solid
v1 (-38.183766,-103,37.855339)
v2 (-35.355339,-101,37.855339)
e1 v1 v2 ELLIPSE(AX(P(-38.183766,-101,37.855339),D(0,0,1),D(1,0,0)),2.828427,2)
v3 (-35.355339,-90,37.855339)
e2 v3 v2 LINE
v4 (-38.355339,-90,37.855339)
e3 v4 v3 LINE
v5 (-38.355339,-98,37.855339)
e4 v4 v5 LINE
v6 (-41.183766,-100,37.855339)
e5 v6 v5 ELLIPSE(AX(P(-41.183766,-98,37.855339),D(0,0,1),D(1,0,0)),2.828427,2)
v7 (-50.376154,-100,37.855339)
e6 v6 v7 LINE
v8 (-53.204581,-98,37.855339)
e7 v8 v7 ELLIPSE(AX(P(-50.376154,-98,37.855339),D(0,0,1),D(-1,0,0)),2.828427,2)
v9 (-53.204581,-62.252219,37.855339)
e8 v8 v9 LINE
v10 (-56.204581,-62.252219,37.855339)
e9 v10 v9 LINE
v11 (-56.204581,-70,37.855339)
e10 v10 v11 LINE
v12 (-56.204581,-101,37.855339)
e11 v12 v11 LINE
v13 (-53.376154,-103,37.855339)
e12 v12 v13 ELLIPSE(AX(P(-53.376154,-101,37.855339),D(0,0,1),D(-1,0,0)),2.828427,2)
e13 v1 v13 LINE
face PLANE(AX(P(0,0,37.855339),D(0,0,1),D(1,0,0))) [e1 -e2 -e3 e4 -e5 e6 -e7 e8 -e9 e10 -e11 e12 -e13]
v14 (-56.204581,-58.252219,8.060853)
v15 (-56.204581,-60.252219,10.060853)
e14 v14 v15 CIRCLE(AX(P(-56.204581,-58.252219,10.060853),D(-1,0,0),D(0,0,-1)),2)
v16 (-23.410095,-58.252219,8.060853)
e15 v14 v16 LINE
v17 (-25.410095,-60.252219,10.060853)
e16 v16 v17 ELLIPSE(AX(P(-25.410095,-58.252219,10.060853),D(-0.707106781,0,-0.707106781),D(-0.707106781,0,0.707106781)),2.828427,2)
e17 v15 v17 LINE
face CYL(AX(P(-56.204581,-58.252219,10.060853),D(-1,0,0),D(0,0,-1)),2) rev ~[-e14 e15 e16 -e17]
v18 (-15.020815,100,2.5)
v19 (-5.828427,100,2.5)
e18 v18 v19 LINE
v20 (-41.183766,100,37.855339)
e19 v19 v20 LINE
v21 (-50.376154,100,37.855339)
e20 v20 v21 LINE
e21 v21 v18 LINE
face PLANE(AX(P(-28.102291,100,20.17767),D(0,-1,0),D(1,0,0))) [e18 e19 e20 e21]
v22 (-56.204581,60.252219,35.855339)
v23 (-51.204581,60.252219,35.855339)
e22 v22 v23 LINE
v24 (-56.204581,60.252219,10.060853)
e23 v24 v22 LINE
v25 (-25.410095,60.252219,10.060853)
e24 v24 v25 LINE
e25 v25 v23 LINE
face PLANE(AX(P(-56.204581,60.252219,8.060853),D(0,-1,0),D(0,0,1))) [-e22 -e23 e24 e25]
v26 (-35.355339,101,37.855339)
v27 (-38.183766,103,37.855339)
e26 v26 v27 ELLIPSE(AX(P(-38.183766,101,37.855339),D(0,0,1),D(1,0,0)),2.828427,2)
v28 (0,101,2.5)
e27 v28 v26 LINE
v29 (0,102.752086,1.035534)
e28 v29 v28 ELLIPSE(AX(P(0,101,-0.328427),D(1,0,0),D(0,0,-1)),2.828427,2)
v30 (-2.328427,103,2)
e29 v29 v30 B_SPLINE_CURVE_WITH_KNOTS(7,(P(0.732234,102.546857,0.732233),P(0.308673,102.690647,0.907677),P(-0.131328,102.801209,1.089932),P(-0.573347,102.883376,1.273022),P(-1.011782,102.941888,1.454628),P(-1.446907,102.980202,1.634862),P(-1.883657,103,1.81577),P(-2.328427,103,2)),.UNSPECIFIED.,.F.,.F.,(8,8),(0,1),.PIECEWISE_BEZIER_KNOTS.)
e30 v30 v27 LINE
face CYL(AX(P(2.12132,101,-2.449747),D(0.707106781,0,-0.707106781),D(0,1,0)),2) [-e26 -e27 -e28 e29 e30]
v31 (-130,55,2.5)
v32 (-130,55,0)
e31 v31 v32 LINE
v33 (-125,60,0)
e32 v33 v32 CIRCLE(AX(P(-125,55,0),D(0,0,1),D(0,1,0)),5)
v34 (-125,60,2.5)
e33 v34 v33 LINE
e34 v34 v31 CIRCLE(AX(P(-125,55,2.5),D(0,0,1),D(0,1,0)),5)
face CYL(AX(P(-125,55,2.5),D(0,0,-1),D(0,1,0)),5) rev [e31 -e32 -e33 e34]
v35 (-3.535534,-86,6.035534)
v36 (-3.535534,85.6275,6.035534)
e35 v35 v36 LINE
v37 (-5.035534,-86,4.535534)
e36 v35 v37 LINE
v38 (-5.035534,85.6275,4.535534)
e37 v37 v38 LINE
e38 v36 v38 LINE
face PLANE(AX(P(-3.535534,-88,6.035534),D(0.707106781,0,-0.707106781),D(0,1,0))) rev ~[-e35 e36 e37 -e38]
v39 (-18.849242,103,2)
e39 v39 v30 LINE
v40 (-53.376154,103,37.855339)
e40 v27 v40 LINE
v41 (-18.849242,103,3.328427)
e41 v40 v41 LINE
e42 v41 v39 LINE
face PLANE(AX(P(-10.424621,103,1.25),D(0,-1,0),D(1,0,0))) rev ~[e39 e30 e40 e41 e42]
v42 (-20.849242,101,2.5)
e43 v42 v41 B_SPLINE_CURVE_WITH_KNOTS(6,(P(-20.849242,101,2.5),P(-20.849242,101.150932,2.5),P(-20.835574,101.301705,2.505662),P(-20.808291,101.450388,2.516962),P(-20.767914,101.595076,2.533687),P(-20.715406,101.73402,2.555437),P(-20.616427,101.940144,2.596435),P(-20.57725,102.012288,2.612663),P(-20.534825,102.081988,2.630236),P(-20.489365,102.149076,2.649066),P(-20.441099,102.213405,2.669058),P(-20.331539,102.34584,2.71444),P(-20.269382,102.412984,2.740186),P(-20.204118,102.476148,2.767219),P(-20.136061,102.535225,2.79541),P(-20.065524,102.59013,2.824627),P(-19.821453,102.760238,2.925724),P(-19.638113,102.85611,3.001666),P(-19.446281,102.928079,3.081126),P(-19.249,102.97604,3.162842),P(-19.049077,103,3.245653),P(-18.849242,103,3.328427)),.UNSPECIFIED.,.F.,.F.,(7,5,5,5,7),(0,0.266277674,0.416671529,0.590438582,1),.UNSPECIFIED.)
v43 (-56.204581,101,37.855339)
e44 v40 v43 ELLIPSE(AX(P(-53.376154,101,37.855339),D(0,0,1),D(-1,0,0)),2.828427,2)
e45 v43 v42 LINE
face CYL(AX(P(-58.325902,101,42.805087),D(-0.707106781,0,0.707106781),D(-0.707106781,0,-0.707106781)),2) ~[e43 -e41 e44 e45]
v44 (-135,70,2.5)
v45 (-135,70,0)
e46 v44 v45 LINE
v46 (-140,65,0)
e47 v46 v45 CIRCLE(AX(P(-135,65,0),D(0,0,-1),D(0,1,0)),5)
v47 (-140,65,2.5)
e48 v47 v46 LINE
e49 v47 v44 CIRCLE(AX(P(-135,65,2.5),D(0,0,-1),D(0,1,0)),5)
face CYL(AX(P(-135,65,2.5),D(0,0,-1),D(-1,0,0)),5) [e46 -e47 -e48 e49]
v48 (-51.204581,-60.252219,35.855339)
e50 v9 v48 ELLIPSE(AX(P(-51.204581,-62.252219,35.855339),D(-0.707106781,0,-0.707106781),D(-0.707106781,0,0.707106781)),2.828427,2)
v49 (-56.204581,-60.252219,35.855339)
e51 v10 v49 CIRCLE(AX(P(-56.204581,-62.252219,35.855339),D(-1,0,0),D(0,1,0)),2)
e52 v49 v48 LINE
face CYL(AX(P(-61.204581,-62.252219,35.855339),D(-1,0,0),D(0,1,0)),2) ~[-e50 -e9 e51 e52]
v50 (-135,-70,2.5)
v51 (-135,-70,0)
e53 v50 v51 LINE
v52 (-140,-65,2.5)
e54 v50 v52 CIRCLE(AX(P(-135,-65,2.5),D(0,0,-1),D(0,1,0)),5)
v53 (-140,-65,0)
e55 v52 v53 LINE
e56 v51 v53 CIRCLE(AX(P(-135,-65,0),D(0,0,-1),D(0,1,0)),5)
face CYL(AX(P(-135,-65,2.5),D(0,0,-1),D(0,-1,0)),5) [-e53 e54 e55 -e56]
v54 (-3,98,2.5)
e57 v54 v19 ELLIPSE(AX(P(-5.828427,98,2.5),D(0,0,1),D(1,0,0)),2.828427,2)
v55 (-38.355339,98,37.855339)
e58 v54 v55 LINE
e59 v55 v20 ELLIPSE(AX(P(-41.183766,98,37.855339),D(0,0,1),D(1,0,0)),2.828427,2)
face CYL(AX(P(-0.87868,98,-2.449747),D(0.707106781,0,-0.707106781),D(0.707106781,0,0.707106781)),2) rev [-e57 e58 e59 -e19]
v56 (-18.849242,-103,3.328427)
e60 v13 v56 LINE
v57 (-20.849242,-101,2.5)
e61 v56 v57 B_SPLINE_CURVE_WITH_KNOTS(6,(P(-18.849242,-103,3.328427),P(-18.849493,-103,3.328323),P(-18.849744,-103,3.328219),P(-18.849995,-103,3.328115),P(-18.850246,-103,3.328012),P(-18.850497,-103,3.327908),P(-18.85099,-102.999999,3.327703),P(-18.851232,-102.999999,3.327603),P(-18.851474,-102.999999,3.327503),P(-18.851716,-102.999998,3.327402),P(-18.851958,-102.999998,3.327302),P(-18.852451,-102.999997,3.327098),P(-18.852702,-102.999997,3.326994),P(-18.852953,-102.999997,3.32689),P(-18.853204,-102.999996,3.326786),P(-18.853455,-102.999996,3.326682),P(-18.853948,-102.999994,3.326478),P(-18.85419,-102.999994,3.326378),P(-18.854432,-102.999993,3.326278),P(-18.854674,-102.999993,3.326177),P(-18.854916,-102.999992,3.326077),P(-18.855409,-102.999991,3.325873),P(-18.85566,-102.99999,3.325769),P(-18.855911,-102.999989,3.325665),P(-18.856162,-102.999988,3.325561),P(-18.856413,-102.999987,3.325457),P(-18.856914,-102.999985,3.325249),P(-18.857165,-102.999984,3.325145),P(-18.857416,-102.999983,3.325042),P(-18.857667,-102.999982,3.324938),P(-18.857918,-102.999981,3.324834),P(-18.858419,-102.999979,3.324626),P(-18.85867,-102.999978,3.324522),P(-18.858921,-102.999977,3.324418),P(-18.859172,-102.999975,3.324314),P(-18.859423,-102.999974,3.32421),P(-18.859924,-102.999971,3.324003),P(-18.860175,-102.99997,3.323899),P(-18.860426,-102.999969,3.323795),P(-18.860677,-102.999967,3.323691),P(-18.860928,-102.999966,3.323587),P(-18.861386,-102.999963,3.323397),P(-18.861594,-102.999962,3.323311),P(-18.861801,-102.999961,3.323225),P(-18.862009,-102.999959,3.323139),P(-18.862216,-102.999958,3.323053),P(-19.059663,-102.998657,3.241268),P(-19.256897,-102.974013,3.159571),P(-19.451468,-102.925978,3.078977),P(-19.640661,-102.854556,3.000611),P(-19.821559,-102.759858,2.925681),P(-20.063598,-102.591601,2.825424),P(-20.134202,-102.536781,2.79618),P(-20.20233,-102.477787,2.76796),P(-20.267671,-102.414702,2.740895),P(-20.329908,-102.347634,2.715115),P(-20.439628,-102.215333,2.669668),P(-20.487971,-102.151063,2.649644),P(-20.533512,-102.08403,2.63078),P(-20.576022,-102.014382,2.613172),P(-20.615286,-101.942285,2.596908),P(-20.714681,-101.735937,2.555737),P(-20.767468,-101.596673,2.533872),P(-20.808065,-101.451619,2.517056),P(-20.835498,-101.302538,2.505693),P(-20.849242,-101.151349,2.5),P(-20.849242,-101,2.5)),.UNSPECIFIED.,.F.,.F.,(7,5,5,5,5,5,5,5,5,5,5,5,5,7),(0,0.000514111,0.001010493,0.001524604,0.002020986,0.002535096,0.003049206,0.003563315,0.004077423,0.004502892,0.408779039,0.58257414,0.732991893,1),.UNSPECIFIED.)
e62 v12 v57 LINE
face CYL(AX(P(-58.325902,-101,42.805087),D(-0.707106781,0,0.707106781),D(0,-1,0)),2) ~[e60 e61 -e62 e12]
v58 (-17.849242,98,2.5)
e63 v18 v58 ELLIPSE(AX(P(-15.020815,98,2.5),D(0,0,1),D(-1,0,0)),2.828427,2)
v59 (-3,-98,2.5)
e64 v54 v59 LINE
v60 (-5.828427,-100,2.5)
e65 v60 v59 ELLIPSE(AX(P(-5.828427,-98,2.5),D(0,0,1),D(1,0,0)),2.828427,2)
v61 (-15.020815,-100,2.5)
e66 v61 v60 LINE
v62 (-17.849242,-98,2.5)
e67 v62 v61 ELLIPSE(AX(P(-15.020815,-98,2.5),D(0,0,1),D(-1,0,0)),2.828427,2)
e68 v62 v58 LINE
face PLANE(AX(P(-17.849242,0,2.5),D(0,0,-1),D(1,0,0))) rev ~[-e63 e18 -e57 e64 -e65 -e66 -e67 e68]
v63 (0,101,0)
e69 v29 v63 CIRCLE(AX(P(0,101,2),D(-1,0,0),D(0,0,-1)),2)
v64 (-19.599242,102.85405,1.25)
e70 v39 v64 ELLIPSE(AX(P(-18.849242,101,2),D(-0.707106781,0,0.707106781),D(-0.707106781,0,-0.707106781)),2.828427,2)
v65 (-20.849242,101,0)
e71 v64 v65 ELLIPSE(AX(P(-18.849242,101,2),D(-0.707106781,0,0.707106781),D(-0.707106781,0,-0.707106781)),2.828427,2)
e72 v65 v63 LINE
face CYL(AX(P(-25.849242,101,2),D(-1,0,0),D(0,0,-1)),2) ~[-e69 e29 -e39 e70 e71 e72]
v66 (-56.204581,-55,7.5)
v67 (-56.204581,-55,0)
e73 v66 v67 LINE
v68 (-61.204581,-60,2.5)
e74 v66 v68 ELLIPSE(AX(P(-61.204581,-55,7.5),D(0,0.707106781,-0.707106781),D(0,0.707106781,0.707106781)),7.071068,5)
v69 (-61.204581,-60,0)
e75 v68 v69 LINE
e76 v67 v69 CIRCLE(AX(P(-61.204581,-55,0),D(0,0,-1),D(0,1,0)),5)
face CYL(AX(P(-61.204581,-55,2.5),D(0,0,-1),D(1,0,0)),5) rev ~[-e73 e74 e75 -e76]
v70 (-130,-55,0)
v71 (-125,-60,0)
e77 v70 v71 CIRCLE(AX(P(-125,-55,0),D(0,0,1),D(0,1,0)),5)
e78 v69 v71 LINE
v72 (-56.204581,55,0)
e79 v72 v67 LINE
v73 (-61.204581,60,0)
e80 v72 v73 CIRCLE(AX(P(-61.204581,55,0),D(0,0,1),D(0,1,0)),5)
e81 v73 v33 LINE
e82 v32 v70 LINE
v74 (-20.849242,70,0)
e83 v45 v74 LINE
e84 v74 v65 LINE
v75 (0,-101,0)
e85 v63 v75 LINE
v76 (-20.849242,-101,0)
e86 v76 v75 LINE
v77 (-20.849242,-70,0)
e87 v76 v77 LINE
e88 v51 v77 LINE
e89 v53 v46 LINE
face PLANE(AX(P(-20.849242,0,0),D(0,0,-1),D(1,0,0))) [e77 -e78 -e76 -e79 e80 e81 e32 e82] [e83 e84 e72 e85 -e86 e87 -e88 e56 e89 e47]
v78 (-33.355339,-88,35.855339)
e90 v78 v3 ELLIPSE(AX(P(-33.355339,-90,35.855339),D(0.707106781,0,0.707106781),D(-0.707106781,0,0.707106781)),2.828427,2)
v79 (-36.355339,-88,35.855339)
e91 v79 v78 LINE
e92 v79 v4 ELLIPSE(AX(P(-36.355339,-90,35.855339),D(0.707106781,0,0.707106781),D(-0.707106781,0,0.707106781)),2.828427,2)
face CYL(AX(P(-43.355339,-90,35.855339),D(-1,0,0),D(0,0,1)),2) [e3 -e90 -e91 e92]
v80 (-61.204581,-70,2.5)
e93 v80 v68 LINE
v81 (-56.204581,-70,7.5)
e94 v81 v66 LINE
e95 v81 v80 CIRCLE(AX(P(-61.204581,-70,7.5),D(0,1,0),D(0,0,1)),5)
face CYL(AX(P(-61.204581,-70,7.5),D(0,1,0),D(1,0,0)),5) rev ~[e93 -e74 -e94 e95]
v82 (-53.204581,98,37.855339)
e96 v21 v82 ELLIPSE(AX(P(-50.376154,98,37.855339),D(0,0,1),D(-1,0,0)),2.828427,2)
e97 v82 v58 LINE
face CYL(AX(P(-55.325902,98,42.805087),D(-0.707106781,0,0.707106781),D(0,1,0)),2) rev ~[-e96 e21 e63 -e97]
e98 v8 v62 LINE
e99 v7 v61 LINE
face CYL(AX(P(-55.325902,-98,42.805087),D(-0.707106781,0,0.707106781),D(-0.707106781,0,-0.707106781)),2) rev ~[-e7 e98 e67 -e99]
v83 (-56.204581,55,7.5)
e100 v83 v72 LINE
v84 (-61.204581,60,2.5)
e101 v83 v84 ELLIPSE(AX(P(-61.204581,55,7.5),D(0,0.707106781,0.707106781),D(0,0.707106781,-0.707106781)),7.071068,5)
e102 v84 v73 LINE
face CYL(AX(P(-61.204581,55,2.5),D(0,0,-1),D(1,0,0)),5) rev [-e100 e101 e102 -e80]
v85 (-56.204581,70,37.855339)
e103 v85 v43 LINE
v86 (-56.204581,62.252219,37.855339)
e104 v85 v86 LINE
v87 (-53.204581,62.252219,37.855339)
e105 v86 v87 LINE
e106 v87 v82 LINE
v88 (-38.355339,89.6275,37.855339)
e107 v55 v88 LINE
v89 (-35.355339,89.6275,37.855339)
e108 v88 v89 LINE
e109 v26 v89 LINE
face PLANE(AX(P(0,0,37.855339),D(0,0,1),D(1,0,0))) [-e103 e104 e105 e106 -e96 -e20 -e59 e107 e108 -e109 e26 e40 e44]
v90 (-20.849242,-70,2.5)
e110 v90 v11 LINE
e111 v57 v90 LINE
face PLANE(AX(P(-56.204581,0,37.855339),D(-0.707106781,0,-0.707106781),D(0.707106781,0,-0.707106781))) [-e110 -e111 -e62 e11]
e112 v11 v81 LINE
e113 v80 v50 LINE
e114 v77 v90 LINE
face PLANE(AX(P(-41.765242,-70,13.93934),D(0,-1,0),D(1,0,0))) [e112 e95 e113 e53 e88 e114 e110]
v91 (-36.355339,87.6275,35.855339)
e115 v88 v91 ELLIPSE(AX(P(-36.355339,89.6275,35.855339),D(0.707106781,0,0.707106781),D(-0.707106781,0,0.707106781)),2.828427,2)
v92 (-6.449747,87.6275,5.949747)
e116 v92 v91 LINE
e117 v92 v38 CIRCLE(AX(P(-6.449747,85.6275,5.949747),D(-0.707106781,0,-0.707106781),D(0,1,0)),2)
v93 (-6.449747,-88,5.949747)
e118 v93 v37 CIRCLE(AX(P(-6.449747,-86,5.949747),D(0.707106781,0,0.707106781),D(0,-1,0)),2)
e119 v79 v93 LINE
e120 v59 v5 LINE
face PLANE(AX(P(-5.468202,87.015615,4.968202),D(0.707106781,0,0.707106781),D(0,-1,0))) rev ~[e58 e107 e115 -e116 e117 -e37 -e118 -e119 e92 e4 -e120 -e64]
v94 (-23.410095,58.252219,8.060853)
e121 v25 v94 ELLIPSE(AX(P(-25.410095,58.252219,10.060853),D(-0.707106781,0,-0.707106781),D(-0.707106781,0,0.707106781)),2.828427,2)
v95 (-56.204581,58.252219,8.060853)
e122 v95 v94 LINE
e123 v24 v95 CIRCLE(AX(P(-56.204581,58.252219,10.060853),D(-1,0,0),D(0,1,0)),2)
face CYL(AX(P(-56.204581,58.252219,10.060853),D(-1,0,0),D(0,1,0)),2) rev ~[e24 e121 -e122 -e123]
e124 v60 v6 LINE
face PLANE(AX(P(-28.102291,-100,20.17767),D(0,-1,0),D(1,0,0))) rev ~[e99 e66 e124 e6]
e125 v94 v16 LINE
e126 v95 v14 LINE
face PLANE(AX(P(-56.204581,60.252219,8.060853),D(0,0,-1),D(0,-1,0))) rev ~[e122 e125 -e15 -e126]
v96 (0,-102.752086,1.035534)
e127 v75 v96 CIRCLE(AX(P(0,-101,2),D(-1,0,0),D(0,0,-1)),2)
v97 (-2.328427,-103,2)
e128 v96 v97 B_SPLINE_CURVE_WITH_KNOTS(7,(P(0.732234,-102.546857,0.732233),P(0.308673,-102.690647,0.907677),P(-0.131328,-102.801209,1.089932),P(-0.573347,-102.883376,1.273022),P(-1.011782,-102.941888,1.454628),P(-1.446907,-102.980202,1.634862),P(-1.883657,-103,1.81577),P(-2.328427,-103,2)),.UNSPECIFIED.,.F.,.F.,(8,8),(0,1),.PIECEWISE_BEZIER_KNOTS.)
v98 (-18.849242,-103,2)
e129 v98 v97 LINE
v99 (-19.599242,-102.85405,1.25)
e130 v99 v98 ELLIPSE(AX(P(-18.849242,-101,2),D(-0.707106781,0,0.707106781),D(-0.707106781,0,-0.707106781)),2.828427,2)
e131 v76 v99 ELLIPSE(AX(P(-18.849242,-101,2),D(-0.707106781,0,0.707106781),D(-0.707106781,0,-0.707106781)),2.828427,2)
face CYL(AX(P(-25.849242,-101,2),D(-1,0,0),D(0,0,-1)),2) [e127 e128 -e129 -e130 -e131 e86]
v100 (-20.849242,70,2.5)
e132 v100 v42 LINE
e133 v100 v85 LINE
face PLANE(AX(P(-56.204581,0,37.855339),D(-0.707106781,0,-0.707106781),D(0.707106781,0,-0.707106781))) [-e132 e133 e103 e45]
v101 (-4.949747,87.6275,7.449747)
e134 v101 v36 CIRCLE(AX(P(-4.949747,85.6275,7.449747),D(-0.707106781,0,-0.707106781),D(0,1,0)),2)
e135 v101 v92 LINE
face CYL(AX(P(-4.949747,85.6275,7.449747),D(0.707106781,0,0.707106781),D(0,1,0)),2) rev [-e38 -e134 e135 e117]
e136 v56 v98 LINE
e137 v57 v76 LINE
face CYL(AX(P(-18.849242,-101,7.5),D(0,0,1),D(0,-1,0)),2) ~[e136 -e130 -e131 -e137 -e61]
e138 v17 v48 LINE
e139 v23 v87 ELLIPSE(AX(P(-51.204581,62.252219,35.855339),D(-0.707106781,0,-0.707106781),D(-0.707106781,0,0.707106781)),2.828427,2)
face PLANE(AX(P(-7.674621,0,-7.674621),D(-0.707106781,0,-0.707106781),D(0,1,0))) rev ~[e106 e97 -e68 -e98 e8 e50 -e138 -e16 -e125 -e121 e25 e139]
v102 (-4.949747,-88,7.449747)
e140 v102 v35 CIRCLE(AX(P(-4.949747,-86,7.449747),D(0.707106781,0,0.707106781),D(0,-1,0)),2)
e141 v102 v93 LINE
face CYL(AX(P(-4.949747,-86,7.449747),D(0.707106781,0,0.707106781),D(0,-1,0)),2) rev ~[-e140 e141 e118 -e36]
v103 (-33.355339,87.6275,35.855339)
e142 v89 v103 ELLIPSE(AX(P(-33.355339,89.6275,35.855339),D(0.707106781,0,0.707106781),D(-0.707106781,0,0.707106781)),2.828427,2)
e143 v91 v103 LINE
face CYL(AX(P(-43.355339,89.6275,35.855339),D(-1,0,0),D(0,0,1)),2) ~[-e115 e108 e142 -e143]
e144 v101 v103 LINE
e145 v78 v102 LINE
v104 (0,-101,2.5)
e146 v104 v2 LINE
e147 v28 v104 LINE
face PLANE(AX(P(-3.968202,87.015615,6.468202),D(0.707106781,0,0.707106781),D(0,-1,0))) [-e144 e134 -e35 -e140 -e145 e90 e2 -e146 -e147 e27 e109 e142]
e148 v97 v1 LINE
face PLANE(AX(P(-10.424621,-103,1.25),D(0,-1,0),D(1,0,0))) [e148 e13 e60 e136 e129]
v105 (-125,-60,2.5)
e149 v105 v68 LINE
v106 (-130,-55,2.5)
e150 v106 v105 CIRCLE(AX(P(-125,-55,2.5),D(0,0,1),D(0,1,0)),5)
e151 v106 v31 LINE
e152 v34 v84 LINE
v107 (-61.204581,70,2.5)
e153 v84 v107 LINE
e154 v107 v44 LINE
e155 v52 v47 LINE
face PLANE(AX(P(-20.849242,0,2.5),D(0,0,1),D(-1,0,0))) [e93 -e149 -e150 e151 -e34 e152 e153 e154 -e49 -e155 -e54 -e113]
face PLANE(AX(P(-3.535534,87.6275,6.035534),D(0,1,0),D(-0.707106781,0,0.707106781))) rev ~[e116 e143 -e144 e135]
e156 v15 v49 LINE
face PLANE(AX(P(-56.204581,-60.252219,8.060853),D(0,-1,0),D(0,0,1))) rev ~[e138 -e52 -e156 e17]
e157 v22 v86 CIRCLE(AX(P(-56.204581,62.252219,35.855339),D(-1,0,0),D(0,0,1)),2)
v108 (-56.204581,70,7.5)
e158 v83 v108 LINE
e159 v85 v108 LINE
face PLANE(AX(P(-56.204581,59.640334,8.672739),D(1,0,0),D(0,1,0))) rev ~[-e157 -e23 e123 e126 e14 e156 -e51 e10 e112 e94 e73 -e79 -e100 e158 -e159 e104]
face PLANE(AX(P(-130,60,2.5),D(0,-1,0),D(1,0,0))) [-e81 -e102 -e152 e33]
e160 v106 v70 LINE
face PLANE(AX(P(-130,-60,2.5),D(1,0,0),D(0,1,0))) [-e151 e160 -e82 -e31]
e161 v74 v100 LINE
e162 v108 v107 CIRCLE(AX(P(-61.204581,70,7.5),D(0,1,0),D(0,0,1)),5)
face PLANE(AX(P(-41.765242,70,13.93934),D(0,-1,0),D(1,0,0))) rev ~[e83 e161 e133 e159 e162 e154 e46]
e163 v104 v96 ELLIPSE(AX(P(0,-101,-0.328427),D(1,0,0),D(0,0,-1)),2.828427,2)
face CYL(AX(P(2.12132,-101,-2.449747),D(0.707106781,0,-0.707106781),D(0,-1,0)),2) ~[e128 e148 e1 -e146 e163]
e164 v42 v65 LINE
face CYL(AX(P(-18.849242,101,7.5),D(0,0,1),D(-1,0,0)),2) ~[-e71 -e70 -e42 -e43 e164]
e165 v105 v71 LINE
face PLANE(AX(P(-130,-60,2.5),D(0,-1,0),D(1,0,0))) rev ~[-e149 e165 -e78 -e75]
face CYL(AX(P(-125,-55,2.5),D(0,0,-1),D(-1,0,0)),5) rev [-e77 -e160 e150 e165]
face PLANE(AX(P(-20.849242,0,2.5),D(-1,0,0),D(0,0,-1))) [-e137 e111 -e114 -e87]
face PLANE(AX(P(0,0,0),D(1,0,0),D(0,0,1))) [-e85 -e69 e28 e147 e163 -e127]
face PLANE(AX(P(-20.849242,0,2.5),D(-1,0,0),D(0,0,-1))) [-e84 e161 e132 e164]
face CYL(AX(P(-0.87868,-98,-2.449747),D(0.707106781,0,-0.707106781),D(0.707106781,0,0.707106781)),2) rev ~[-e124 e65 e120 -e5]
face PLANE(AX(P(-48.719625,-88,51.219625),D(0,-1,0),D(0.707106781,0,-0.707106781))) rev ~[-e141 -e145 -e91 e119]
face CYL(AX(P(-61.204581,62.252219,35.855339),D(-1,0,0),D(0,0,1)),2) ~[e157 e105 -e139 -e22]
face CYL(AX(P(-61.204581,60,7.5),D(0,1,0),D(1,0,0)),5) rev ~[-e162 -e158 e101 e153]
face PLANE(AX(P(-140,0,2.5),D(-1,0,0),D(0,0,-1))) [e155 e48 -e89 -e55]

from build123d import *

# Parameters (mm, degrees)
F1_DEPTH      = 70
F2_DEPTH      = 103
F3_DEPTH      = 100
F4_W          = 175.6275002956
F4_H          = 18.8999543782
F4_H_2        = 45
F5_DEPTH      = 5
F6_DEPTH      = 70
F7_W          = 60.2522194386
F7_H          = 29.7944860623
F8_DEPTH      = 77
F9_W          = 73.7954185358
F9_H          = 120
F10_DEPTH     = 25
F11_R         = 5
F12_T1_DEPTH  = 2.1213203436
F12_T6_DEPTH  = 60
F12_T12_DEPTH = 60
F12_T18_DEPTH = 60
F12_T24_DEPTH = 60
F12_T30_DEPTH = 37.7944860623
F12_T35_DEPTH = 37.7944860623
F12_T37_DEPTH = 60
F12_T39_DEPTH = 13
F12_T41_DEPTH = 13
F12_T43_DEPTH = 30.8492424049
F12_T48_DEPTH = 60
F12_T53_DEPTH = 60
F12_T58_DEPTH = 12.5
F12_T63_DEPTH = 12.5
F12_T69_DEPTH = 7.5
F12_T73_DEPTH = 60
F12_T81_DEPTH = 7.5
F12_T85_DEPTH = 60


# Not quite as in the source:
# - a fillet or chamfer that OpenCascade refuses, or shapes differently, is made with other operations: its cross-section is extruded or revolved along the edge and cut away or added


with BuildPart() as f1:
    # F0 (on Front) → F1 (new body, symmetric)
    with BuildSketch(Plane.XZ):
        Polygon((-140, 0), (-20.8492424049, 0), (-20.8492424049, 2.5), (-53.2045814642, 2.5), (-56.2045814642, 2.5), (-140, 2.5), align=None)
    extrude(amount=F1_DEPTH, both=True)

    # F0 (on Front) → F2 (join, symmetric)
    with BuildSketch(Plane.XZ):
        Polygon((-20.8492424049, 0), (0, 0), (0, 2.5), (-3, 2.5), (-17.8492424049, 2.5), (-20.8492424049, 2.5), align=None)
        Polygon((-53.2045814642, 34.8553390593), (-20.8492424049, 2.5), (-17.8492424049, 2.5), (-53.2045814642, 37.8553390593), (-56.2045814642, 37.8553390593), align=None)
        Polygon((-3, 2.5), (0, 2.5), (-35.3553390593, 37.8553390593), (-38.3553390593, 37.8553390593), align=None)
        Polygon((-17.8492424049, 2.5), (-3, 2.5), (-38.3553390593, 37.8553390593), (-53.2045814642, 37.8553390593), align=None)
    extrude(amount=F2_DEPTH, both=True)

    # F0 (on Front) → F3 (cut, symmetric)
    with BuildSketch(Plane.XZ):
        Polygon((-17.8492424049, 2.5), (-3, 2.5), (-38.3553390593, 37.8553390593), (-53.2045814642, 37.8553390593), align=None)
    extrude(amount=F3_DEPTH, both=True, mode=Mode.SUBTRACT)

    # F4 (on face) → F5 (cut)
    with BuildSketch(Plane(origin=(1.25, 0, 1.25), x_dir=(0, 1, 0), z_dir=(0.7071067812, 0, 0.7071067812))):
        with Locations((-0.1862498522, 61.217744142)):
            Rectangle(F4_W, F4_H)
        with Locations((-0.1862498522, 29.267766953)):
            Rectangle(F4_W, F4_H_2)
    extrude(amount=-F5_DEPTH, mode=Mode.SUBTRACT)

    # F0 (on Front) → F6 (join, symmetric)
    with BuildSketch(Plane.XZ):
        Polygon((-53.2045814642, 2.5), (-20.8492424049, 2.5), (-53.2045814642, 34.8553390593), align=None)
        Polygon((-56.2045814642, 2.5), (-53.2045814642, 2.5), (-53.2045814642, 34.8553390593), (-56.2045814642, 37.8553390593), align=None)
    extrude(amount=F6_DEPTH, both=True)

    # F7 (on face) → F8 (cut)
    with BuildSketch(Plane(origin=(-56.2045814642, 0, 0), x_dir=(0, -1, 0), z_dir=(-1, 0, 0))):
        with Locations((-30.1261097193, 22.9580960282)):
            Rectangle(F7_W, F7_H)
        with Locations((30.1261097193, 22.9580960282)):
            Rectangle(F7_W, F7_H)
    extrude(amount=-F8_DEPTH, mode=Mode.SUBTRACT)

    # F9 (on face) → F10 (cut)
    with BuildSketch(Plane.XY.offset(2.5)):
        with Locations((-93.1022907321, 0)):
            Rectangle(F9_W, F9_H)
    extrude(amount=-F10_DEPTH, mode=Mode.SUBTRACT)

    # F11
    f11_edges = [f1.edges().sort_by_distance(p)[0] for p in [
        (-56.204581, 65, 2.5),
        (-56.204581, -65, 2.5),
        (-140, -70, 1.25),
        (-140, 70, 1.25),
        (-130, -60, 1.25),
        (-130, 60, 1.25),
        (-56.204581, 60, 1.25),
        (-56.204581, -60, 1.25),
    ]]
    fillet(f11_edges, radius=F11_R)

    # F12: fillet of radius 2 on 20 edges, made by hand

    # F12_s2 → F12_t1 (join)
    with BuildSketch(Plane(origin=(1.25, 0, 1.25), x_dir=(0, 1, 0), z_dir=(-0.7071067812, 0, -0.7071067812))):
        with BuildLine():
            ThreePointArc((87.6275002956, -8.767766953), (87.041713858, -7.3535533906), (85.6275002956, -6.767766953))
            Line((85.6275002956, -6.767766953), (87.6275002956, -6.767766953))
            Line((87.6275002956, -6.767766953), (87.6275002956, -8.767766953))
        make_face()
        with BuildLine():
            ThreePointArc((-88, -8.767766953), (-87.4142135624, -7.3535533906), (-86, -6.767766953))
            Line((-86, -6.767766953), (-88, -6.767766953))
            Line((-88, -6.767766953), (-88, -8.767766953))
        make_face()
    extrude(amount=F12_T1_DEPTH)


with BuildPart() as f12_tool4:
    # F12_s5 → F12_t6 (new body)
    with BuildSketch(Plane(origin=(0.7855339059, 0, -0.7855339059), x_dir=(0, 1, 0), z_dir=(-0.7071067812, 0, 0.7071067812))):
        with BuildLine():
            ThreePointArc((-98, 0.3535533906), (-99.4142135624, 0.9393398282), (-100, 2.3535533906))
            Line((-100, 2.3535533906), (-100, 0.3535533906))
            Line((-100, 0.3535533906), (-98, 0.3535533906))
        make_face()
    extrude(amount=F12_T6_DEPTH)

    split(bisect_by=Plane.XY.offset(37.8553390593), keep=Keep.BOTTOM)

    split(bisect_by=Plane.XY.offset(2.5), keep=Keep.TOP)


with BuildPart() as f1_1:
    add(f1.part)

    # F12_t3: union F12_tool4
    add(f12_tool4.part)


with BuildPart() as f12_tool10:
    # F12_s11 → F12_t12 (new body)
    with BuildSketch(Plane(origin=(-49.0654941677, 0, 49.0654941677), x_dir=(0, 1, 0), z_dir=(0.7071067812, 0, -0.7071067812))):
        with BuildLine():
            ThreePointArc((-98, -10.8535533906), (-99.4142135624, -10.267766953), (-100, -8.8535533906))
            Line((-100, -8.8535533906), (-100, -10.8535533906))
            Line((-100, -10.8535533906), (-98, -10.8535533906))
        make_face()
    extrude(amount=F12_T12_DEPTH)

    split(bisect_by=Plane.XY.offset(37.8553390593), keep=Keep.BOTTOM)

    split(bisect_by=Plane.XY.offset(2.5), keep=Keep.TOP)


with BuildPart() as f1_2:
    add(f1_1.part)

    # F12_t9: union F12_tool10
    add(f12_tool10.part)


with BuildPart() as f12_tool16:
    # F12_s17 → F12_t18 (new body)
    with BuildSketch(Plane(origin=(-49.0654941677, 0, 49.0654941677), x_dir=(0, 1, 0), z_dir=(0.7071067812, 0, -0.7071067812))):
        with BuildLine():
            ThreePointArc((100, -8.8535533906), (99.4142135624, -10.267766953), (98, -10.8535533906))
            Line((98, -10.8535533906), (100, -10.8535533906))
            Line((100, -10.8535533906), (100, -8.8535533906))
        make_face()
    extrude(amount=F12_T18_DEPTH)

    split(bisect_by=Plane.XY.offset(37.8553390593), keep=Keep.BOTTOM)

    split(bisect_by=Plane.XY.offset(2.5), keep=Keep.TOP)


with BuildPart() as f1_3:
    add(f1_2.part)

    # F12_t15: union F12_tool16
    add(f12_tool16.part)


with BuildPart() as f12_tool22:
    # F12_s23 → F12_t24 (new body)
    with BuildSketch(Plane(origin=(0.7855339059, 0, -0.7855339059), x_dir=(0, 1, 0), z_dir=(-0.7071067812, 0, 0.7071067812))):
        with BuildLine():
            ThreePointArc((98, 0.3535533906), (99.4142135624, 0.9393398282), (100, 2.3535533906))
            Line((100, 2.3535533906), (100, 0.3535533906))
            Line((100, 0.3535533906), (98, 0.3535533906))
        make_face()
    extrude(amount=F12_T24_DEPTH)

    split(bisect_by=Plane.XY.offset(37.8553390593), keep=Keep.BOTTOM)

    split(bisect_by=Plane.XY.offset(2.5), keep=Keep.TOP)


with BuildPart() as f1_4:
    add(f1_3.part)

    # F12_t21: union F12_tool22
    add(f12_tool22.part)


with BuildPart() as f12_tool28:
    # F12_s29 → F12_t30 (new body)
    with BuildSketch(Plane.YZ.offset(-56.2045814642)):
        with BuildLine():
            ThreePointArc((-58.2522194386, 8.060852997), (-59.6664330009, 8.6466394346), (-60.2522194386, 10.060852997))
            Line((-60.2522194386, 10.060852997), (-60.2522194386, 8.060852997))
            Line((-60.2522194386, 8.060852997), (-58.2522194386, 8.060852997))
        make_face()
    extrude(amount=F12_T30_DEPTH)

    split(bisect_by=Plane(origin=(-7.6746212025, 0, -7.6746212025), x_dir=(0, 1, 0), z_dir=(-0.7071067812, 0, -0.7071067812)), keep=Keep.TOP)


with BuildPart() as f1_5:
    add(f1_4.part)

    # F12_t27: union F12_tool28
    add(f12_tool28.part)


with BuildPart() as f12_tool33:
    # F12_s34 → F12_t35 (new body)
    with BuildSketch(Plane.YZ.offset(-56.2045814642)):
        with BuildLine():
            ThreePointArc((60.2522194386, 10.060852997), (59.6664330009, 8.6466394346), (58.2522194386, 8.060852997))
            Line((58.2522194386, 8.060852997), (60.2522194386, 8.060852997))
            Line((60.2522194386, 8.060852997), (60.2522194386, 10.060852997))
        make_face()
    extrude(amount=F12_T35_DEPTH)

    split(bisect_by=Plane(origin=(-7.6746212025, 0, -7.6746212025), x_dir=(0, 1, 0), z_dir=(-0.7071067812, 0, -0.7071067812)), keep=Keep.TOP)


with BuildPart() as f1_6:
    add(f1_5.part)

    # F12_t32: union F12_tool33
    add(f12_tool33.part)

    # F12_s38 → F12_t37 (cut)
    with BuildSketch(Plane(origin=(2.2855339059, 0, -2.2855339059), x_dir=(0, 1, 0), z_dir=(-0.7071067812, 0, 0.7071067812))):
        with BuildLine():
            ThreePointArc((-103, 0.232233047), (-102.4142135624, -1.1819805153), (-101, -1.767766953))
            Line((-101, -1.767766953), (-103, -1.767766953))
            Line((-103, -1.767766953), (-103, 0.232233047))
        make_face()
        with BuildLine():
            ThreePointArc((103, 0.232233047), (102.4142135624, -1.1819805153), (101, -1.767766953))
            Line((101, -1.767766953), (103, -1.767766953))
            Line((103, -1.767766953), (103, 0.232233047))
        make_face()
    extrude(amount=F12_T37_DEPTH, mode=Mode.SUBTRACT)

    # F12_s40 → F12_t39 (cut)
    with BuildSketch(Plane.YZ.offset(-43.3553390593)):
        with BuildLine():
            ThreePointArc((-90, 37.8553390593), (-88.5857864376, 37.2695526217), (-88, 35.8553390593))
            Line((-88, 35.8553390593), (-88, 37.8553390593))
            Line((-88, 37.8553390593), (-90, 37.8553390593))
        make_face()
        with BuildLine():
            ThreePointArc((89.6275002956, 37.8553390593), (88.2132867333, 37.2695526217), (87.6275002956, 35.8553390593))
            Line((87.6275002956, 35.8553390593), (87.6275002956, 37.8553390593))
            Line((87.6275002956, 37.8553390593), (89.6275002956, 37.8553390593))
        make_face()
    extrude(amount=F12_T39_DEPTH, mode=Mode.SUBTRACT)

    # F12_s42 → F12_t41 (cut)
    with BuildSketch(Plane.YZ.offset(-61.2045814642)):
        with BuildLine():
            ThreePointArc((62.2522194386, 37.8553390593), (60.8380058762, 37.2695526217), (60.2522194386, 35.8553390593))
            Line((60.2522194386, 35.8553390593), (60.2522194386, 37.8553390593))
            Line((60.2522194386, 37.8553390593), (62.2522194386, 37.8553390593))
        make_face()
        with BuildLine():
            ThreePointArc((-60.2522194386, 35.8553390593), (-60.8380058762, 37.2695526217), (-62.2522194386, 37.8553390593))
            Line((-62.2522194386, 37.8553390593), (-60.2522194386, 37.8553390593))
            Line((-60.2522194386, 37.8553390593), (-60.2522194386, 35.8553390593))
        make_face()
    extrude(amount=F12_T41_DEPTH, mode=Mode.SUBTRACT)

    # F12_s44 → F12_t43 (cut)
    with BuildSketch(Plane.YZ.offset(-25.8492424049)):
        with BuildLine():
            ThreePointArc((-101, 0), (-102.4142135624, 0.5857864376), (-103, 2))
            Line((-103, 2), (-103, 0))
            Line((-103, 0), (-101, 0))
        make_face()
        with BuildLine():
            ThreePointArc((101, 0), (102.4142135624, 0.5857864376), (103, 2))
            Line((103, 2), (103, 0))
            Line((103, 0), (101, 0))
        make_face()
    extrude(amount=F12_T43_DEPTH, mode=Mode.SUBTRACT)


with BuildPart() as f12_tool46:
    # F12_s47 → F12_t48 (new body)
    with BuildSketch(Plane(origin=(-50.5654941677, 0, 50.5654941677), x_dir=(0, 1, 0), z_dir=(0.7071067812, 0, -0.7071067812))):
        with BuildLine():
            ThreePointArc((-103, -10.9748737342), (-102.4142135624, -12.3890872965), (-101, -12.9748737342))
            Line((-101, -12.9748737342), (-103, -12.9748737342))
            Line((-103, -12.9748737342), (-103, -10.9748737342))
        make_face()
    extrude(amount=F12_T48_DEPTH)

    split(bisect_by=Plane.YZ.offset(-20.8492424049), keep=Keep.BOTTOM)


with BuildPart() as f1_7:
    add(f1_6.part)

    # F12_t45: cut F12_tool46
    add(f12_tool46.part, mode=Mode.SUBTRACT)


with BuildPart() as f12_tool51:
    # F12_s52 → F12_t53 (new body)
    with BuildSketch(Plane(origin=(-50.5654941677, 0, 50.5654941677), x_dir=(0, 1, 0), z_dir=(0.7071067812, 0, -0.7071067812))):
        with BuildLine():
            ThreePointArc((101, -12.9748737342), (102.4142135624, -12.3890872965), (103, -10.9748737342))
            Line((103, -10.9748737342), (103, -12.9748737342))
            Line((103, -12.9748737342), (101, -12.9748737342))
        make_face()
    extrude(amount=F12_T53_DEPTH)

    split(bisect_by=Plane.YZ.offset(-20.8492424049), keep=Keep.BOTTOM)


with BuildPart() as f1_8:
    add(f1_7.part)

    # F12_t50: cut F12_tool51
    add(f12_tool51.part, mode=Mode.SUBTRACT)


with BuildPart() as f12_tool56:
    # F12_s57 → F12_t58 (new body)
    with BuildSketch(Plane.XY.offset(7.5)):
        with BuildLine():
            ThreePointArc((-20.8492424049, 101), (-20.2634559673, 102.4142135624), (-18.8492424049, 103))
            Line((-18.8492424049, 103), (-20.8492424049, 103))
            Line((-20.8492424049, 103), (-20.8492424049, 101))
        make_face()
    extrude(amount=-F12_T58_DEPTH)

    split(bisect_by=Plane(origin=(-9.1746212025, 0, -9.1746212025), x_dir=(0, 1, 0), z_dir=(-0.7071067812, 0, -0.7071067812)), keep=Keep.TOP)


with BuildPart() as f1_9:
    add(f1_8.part)

    # F12_t55: cut F12_tool56
    add(f12_tool56.part, mode=Mode.SUBTRACT)


with BuildPart() as f12_tool61:
    # F12_s62 → F12_t63 (new body)
    with BuildSketch(Plane.XY.offset(7.5)):
        with BuildLine():
            ThreePointArc((-18.8492424049, -103), (-20.2634559673, -102.4142135624), (-20.8492424049, -101))
            Line((-20.8492424049, -101), (-20.8492424049, -103))
            Line((-20.8492424049, -103), (-18.8492424049, -103))
        make_face()
    extrude(amount=-F12_T63_DEPTH)

    split(bisect_by=Plane(origin=(-9.1746212025, 0, -9.1746212025), x_dir=(0, 1, 0), z_dir=(-0.7071067812, 0, -0.7071067812)), keep=Keep.TOP)


with BuildPart() as f1_10:
    add(f1_9.part)

    # F12_t60: cut F12_tool61
    add(f12_tool61.part, mode=Mode.SUBTRACT)


with BuildPart() as f12_tool67:
    # F12_s68 → F12_t69 (new body)
    with BuildSketch(Plane.XY.offset(7.5)):
        with BuildLine():
            ThreePointArc((-18.8492424049, -103), (-20.2634559673, -102.4142135624), (-20.8492424049, -101))
            Line((-20.8492424049, -101), (-20.8492424049, -103))
            Line((-20.8492424049, -103), (-18.8492424049, -103))
        make_face()
    extrude(amount=-F12_T69_DEPTH)

    split(bisect_by=Plane(origin=(-9.1746212025, 0, -9.1746212025), x_dir=(0, 1, 0), z_dir=(0.7071067812, 0, 0.7071067812)), keep=Keep.TOP)


with BuildPart() as f12_tool71:
    # F12_s72 → F12_t73 (new body)
    with BuildSketch(Plane(origin=(-50.5654941677, 0, 50.5654941677), x_dir=(0, 1, 0), z_dir=(0.7071067812, 0, -0.7071067812))):
        with BuildLine():
            ThreePointArc((-103, -10.9748737342), (-102.4142135624, -12.3890872965), (-101, -12.9748737342))
            Line((-101, -12.9748737342), (-103, -12.9748737342))
            Line((-103, -12.9748737342), (-103, -10.9748737342))
        make_face()
    extrude(amount=F12_T73_DEPTH)

    split(bisect_by=Plane.XY, keep=Keep.TOP)

    split(bisect_by=Plane.YZ.offset(-20.8492424049), keep=Keep.TOP)


with BuildPart() as f12_tool67_1:
    add(f12_tool67.part)

    # F12_t76: intersect F12_tool71
    add(f12_tool71.part, mode=Mode.INTERSECT)


with BuildPart() as f1_11:
    add(f1_10.part)

    # F12_t65: cut F12_tool67
    add(f12_tool67_1.part, mode=Mode.SUBTRACT)


with BuildPart() as f12_tool79:
    # F12_s80 → F12_t81 (new body)
    with BuildSketch(Plane.XY.offset(7.5)):
        with BuildLine():
            ThreePointArc((-20.8492424049, 101), (-20.2634559673, 102.4142135624), (-18.8492424049, 103))
            Line((-18.8492424049, 103), (-20.8492424049, 103))
            Line((-20.8492424049, 103), (-20.8492424049, 101))
        make_face()
    extrude(amount=-F12_T81_DEPTH)

    split(bisect_by=Plane(origin=(-9.1746212025, 0, -9.1746212025), x_dir=(0, 1, 0), z_dir=(0.7071067812, 0, 0.7071067812)), keep=Keep.TOP)


with BuildPart() as f12_tool83:
    # F12_s84 → F12_t85 (new body)
    with BuildSketch(Plane(origin=(-50.5654941677, 0, 50.5654941677), x_dir=(0, 1, 0), z_dir=(0.7071067812, 0, -0.7071067812))):
        with BuildLine():
            ThreePointArc((101, -12.9748737342), (102.4142135624, -12.3890872965), (103, -10.9748737342))
            Line((103, -10.9748737342), (103, -12.9748737342))
            Line((103, -12.9748737342), (101, -12.9748737342))
        make_face()
    extrude(amount=F12_T85_DEPTH)

    split(bisect_by=Plane.XY, keep=Keep.TOP)

    split(bisect_by=Plane.YZ.offset(-20.8492424049), keep=Keep.TOP)


with BuildPart() as f12_tool79_1:
    add(f12_tool79.part)

    # F12_t88: intersect F12_tool83
    add(f12_tool83.part, mode=Mode.INTERSECT)


with BuildPart() as f1_12:
    add(f1_11.part)

    # F12_t77: cut F12_tool79
    add(f12_tool79_1.part, mode=Mode.SUBTRACT)


solid = f1_12.part
